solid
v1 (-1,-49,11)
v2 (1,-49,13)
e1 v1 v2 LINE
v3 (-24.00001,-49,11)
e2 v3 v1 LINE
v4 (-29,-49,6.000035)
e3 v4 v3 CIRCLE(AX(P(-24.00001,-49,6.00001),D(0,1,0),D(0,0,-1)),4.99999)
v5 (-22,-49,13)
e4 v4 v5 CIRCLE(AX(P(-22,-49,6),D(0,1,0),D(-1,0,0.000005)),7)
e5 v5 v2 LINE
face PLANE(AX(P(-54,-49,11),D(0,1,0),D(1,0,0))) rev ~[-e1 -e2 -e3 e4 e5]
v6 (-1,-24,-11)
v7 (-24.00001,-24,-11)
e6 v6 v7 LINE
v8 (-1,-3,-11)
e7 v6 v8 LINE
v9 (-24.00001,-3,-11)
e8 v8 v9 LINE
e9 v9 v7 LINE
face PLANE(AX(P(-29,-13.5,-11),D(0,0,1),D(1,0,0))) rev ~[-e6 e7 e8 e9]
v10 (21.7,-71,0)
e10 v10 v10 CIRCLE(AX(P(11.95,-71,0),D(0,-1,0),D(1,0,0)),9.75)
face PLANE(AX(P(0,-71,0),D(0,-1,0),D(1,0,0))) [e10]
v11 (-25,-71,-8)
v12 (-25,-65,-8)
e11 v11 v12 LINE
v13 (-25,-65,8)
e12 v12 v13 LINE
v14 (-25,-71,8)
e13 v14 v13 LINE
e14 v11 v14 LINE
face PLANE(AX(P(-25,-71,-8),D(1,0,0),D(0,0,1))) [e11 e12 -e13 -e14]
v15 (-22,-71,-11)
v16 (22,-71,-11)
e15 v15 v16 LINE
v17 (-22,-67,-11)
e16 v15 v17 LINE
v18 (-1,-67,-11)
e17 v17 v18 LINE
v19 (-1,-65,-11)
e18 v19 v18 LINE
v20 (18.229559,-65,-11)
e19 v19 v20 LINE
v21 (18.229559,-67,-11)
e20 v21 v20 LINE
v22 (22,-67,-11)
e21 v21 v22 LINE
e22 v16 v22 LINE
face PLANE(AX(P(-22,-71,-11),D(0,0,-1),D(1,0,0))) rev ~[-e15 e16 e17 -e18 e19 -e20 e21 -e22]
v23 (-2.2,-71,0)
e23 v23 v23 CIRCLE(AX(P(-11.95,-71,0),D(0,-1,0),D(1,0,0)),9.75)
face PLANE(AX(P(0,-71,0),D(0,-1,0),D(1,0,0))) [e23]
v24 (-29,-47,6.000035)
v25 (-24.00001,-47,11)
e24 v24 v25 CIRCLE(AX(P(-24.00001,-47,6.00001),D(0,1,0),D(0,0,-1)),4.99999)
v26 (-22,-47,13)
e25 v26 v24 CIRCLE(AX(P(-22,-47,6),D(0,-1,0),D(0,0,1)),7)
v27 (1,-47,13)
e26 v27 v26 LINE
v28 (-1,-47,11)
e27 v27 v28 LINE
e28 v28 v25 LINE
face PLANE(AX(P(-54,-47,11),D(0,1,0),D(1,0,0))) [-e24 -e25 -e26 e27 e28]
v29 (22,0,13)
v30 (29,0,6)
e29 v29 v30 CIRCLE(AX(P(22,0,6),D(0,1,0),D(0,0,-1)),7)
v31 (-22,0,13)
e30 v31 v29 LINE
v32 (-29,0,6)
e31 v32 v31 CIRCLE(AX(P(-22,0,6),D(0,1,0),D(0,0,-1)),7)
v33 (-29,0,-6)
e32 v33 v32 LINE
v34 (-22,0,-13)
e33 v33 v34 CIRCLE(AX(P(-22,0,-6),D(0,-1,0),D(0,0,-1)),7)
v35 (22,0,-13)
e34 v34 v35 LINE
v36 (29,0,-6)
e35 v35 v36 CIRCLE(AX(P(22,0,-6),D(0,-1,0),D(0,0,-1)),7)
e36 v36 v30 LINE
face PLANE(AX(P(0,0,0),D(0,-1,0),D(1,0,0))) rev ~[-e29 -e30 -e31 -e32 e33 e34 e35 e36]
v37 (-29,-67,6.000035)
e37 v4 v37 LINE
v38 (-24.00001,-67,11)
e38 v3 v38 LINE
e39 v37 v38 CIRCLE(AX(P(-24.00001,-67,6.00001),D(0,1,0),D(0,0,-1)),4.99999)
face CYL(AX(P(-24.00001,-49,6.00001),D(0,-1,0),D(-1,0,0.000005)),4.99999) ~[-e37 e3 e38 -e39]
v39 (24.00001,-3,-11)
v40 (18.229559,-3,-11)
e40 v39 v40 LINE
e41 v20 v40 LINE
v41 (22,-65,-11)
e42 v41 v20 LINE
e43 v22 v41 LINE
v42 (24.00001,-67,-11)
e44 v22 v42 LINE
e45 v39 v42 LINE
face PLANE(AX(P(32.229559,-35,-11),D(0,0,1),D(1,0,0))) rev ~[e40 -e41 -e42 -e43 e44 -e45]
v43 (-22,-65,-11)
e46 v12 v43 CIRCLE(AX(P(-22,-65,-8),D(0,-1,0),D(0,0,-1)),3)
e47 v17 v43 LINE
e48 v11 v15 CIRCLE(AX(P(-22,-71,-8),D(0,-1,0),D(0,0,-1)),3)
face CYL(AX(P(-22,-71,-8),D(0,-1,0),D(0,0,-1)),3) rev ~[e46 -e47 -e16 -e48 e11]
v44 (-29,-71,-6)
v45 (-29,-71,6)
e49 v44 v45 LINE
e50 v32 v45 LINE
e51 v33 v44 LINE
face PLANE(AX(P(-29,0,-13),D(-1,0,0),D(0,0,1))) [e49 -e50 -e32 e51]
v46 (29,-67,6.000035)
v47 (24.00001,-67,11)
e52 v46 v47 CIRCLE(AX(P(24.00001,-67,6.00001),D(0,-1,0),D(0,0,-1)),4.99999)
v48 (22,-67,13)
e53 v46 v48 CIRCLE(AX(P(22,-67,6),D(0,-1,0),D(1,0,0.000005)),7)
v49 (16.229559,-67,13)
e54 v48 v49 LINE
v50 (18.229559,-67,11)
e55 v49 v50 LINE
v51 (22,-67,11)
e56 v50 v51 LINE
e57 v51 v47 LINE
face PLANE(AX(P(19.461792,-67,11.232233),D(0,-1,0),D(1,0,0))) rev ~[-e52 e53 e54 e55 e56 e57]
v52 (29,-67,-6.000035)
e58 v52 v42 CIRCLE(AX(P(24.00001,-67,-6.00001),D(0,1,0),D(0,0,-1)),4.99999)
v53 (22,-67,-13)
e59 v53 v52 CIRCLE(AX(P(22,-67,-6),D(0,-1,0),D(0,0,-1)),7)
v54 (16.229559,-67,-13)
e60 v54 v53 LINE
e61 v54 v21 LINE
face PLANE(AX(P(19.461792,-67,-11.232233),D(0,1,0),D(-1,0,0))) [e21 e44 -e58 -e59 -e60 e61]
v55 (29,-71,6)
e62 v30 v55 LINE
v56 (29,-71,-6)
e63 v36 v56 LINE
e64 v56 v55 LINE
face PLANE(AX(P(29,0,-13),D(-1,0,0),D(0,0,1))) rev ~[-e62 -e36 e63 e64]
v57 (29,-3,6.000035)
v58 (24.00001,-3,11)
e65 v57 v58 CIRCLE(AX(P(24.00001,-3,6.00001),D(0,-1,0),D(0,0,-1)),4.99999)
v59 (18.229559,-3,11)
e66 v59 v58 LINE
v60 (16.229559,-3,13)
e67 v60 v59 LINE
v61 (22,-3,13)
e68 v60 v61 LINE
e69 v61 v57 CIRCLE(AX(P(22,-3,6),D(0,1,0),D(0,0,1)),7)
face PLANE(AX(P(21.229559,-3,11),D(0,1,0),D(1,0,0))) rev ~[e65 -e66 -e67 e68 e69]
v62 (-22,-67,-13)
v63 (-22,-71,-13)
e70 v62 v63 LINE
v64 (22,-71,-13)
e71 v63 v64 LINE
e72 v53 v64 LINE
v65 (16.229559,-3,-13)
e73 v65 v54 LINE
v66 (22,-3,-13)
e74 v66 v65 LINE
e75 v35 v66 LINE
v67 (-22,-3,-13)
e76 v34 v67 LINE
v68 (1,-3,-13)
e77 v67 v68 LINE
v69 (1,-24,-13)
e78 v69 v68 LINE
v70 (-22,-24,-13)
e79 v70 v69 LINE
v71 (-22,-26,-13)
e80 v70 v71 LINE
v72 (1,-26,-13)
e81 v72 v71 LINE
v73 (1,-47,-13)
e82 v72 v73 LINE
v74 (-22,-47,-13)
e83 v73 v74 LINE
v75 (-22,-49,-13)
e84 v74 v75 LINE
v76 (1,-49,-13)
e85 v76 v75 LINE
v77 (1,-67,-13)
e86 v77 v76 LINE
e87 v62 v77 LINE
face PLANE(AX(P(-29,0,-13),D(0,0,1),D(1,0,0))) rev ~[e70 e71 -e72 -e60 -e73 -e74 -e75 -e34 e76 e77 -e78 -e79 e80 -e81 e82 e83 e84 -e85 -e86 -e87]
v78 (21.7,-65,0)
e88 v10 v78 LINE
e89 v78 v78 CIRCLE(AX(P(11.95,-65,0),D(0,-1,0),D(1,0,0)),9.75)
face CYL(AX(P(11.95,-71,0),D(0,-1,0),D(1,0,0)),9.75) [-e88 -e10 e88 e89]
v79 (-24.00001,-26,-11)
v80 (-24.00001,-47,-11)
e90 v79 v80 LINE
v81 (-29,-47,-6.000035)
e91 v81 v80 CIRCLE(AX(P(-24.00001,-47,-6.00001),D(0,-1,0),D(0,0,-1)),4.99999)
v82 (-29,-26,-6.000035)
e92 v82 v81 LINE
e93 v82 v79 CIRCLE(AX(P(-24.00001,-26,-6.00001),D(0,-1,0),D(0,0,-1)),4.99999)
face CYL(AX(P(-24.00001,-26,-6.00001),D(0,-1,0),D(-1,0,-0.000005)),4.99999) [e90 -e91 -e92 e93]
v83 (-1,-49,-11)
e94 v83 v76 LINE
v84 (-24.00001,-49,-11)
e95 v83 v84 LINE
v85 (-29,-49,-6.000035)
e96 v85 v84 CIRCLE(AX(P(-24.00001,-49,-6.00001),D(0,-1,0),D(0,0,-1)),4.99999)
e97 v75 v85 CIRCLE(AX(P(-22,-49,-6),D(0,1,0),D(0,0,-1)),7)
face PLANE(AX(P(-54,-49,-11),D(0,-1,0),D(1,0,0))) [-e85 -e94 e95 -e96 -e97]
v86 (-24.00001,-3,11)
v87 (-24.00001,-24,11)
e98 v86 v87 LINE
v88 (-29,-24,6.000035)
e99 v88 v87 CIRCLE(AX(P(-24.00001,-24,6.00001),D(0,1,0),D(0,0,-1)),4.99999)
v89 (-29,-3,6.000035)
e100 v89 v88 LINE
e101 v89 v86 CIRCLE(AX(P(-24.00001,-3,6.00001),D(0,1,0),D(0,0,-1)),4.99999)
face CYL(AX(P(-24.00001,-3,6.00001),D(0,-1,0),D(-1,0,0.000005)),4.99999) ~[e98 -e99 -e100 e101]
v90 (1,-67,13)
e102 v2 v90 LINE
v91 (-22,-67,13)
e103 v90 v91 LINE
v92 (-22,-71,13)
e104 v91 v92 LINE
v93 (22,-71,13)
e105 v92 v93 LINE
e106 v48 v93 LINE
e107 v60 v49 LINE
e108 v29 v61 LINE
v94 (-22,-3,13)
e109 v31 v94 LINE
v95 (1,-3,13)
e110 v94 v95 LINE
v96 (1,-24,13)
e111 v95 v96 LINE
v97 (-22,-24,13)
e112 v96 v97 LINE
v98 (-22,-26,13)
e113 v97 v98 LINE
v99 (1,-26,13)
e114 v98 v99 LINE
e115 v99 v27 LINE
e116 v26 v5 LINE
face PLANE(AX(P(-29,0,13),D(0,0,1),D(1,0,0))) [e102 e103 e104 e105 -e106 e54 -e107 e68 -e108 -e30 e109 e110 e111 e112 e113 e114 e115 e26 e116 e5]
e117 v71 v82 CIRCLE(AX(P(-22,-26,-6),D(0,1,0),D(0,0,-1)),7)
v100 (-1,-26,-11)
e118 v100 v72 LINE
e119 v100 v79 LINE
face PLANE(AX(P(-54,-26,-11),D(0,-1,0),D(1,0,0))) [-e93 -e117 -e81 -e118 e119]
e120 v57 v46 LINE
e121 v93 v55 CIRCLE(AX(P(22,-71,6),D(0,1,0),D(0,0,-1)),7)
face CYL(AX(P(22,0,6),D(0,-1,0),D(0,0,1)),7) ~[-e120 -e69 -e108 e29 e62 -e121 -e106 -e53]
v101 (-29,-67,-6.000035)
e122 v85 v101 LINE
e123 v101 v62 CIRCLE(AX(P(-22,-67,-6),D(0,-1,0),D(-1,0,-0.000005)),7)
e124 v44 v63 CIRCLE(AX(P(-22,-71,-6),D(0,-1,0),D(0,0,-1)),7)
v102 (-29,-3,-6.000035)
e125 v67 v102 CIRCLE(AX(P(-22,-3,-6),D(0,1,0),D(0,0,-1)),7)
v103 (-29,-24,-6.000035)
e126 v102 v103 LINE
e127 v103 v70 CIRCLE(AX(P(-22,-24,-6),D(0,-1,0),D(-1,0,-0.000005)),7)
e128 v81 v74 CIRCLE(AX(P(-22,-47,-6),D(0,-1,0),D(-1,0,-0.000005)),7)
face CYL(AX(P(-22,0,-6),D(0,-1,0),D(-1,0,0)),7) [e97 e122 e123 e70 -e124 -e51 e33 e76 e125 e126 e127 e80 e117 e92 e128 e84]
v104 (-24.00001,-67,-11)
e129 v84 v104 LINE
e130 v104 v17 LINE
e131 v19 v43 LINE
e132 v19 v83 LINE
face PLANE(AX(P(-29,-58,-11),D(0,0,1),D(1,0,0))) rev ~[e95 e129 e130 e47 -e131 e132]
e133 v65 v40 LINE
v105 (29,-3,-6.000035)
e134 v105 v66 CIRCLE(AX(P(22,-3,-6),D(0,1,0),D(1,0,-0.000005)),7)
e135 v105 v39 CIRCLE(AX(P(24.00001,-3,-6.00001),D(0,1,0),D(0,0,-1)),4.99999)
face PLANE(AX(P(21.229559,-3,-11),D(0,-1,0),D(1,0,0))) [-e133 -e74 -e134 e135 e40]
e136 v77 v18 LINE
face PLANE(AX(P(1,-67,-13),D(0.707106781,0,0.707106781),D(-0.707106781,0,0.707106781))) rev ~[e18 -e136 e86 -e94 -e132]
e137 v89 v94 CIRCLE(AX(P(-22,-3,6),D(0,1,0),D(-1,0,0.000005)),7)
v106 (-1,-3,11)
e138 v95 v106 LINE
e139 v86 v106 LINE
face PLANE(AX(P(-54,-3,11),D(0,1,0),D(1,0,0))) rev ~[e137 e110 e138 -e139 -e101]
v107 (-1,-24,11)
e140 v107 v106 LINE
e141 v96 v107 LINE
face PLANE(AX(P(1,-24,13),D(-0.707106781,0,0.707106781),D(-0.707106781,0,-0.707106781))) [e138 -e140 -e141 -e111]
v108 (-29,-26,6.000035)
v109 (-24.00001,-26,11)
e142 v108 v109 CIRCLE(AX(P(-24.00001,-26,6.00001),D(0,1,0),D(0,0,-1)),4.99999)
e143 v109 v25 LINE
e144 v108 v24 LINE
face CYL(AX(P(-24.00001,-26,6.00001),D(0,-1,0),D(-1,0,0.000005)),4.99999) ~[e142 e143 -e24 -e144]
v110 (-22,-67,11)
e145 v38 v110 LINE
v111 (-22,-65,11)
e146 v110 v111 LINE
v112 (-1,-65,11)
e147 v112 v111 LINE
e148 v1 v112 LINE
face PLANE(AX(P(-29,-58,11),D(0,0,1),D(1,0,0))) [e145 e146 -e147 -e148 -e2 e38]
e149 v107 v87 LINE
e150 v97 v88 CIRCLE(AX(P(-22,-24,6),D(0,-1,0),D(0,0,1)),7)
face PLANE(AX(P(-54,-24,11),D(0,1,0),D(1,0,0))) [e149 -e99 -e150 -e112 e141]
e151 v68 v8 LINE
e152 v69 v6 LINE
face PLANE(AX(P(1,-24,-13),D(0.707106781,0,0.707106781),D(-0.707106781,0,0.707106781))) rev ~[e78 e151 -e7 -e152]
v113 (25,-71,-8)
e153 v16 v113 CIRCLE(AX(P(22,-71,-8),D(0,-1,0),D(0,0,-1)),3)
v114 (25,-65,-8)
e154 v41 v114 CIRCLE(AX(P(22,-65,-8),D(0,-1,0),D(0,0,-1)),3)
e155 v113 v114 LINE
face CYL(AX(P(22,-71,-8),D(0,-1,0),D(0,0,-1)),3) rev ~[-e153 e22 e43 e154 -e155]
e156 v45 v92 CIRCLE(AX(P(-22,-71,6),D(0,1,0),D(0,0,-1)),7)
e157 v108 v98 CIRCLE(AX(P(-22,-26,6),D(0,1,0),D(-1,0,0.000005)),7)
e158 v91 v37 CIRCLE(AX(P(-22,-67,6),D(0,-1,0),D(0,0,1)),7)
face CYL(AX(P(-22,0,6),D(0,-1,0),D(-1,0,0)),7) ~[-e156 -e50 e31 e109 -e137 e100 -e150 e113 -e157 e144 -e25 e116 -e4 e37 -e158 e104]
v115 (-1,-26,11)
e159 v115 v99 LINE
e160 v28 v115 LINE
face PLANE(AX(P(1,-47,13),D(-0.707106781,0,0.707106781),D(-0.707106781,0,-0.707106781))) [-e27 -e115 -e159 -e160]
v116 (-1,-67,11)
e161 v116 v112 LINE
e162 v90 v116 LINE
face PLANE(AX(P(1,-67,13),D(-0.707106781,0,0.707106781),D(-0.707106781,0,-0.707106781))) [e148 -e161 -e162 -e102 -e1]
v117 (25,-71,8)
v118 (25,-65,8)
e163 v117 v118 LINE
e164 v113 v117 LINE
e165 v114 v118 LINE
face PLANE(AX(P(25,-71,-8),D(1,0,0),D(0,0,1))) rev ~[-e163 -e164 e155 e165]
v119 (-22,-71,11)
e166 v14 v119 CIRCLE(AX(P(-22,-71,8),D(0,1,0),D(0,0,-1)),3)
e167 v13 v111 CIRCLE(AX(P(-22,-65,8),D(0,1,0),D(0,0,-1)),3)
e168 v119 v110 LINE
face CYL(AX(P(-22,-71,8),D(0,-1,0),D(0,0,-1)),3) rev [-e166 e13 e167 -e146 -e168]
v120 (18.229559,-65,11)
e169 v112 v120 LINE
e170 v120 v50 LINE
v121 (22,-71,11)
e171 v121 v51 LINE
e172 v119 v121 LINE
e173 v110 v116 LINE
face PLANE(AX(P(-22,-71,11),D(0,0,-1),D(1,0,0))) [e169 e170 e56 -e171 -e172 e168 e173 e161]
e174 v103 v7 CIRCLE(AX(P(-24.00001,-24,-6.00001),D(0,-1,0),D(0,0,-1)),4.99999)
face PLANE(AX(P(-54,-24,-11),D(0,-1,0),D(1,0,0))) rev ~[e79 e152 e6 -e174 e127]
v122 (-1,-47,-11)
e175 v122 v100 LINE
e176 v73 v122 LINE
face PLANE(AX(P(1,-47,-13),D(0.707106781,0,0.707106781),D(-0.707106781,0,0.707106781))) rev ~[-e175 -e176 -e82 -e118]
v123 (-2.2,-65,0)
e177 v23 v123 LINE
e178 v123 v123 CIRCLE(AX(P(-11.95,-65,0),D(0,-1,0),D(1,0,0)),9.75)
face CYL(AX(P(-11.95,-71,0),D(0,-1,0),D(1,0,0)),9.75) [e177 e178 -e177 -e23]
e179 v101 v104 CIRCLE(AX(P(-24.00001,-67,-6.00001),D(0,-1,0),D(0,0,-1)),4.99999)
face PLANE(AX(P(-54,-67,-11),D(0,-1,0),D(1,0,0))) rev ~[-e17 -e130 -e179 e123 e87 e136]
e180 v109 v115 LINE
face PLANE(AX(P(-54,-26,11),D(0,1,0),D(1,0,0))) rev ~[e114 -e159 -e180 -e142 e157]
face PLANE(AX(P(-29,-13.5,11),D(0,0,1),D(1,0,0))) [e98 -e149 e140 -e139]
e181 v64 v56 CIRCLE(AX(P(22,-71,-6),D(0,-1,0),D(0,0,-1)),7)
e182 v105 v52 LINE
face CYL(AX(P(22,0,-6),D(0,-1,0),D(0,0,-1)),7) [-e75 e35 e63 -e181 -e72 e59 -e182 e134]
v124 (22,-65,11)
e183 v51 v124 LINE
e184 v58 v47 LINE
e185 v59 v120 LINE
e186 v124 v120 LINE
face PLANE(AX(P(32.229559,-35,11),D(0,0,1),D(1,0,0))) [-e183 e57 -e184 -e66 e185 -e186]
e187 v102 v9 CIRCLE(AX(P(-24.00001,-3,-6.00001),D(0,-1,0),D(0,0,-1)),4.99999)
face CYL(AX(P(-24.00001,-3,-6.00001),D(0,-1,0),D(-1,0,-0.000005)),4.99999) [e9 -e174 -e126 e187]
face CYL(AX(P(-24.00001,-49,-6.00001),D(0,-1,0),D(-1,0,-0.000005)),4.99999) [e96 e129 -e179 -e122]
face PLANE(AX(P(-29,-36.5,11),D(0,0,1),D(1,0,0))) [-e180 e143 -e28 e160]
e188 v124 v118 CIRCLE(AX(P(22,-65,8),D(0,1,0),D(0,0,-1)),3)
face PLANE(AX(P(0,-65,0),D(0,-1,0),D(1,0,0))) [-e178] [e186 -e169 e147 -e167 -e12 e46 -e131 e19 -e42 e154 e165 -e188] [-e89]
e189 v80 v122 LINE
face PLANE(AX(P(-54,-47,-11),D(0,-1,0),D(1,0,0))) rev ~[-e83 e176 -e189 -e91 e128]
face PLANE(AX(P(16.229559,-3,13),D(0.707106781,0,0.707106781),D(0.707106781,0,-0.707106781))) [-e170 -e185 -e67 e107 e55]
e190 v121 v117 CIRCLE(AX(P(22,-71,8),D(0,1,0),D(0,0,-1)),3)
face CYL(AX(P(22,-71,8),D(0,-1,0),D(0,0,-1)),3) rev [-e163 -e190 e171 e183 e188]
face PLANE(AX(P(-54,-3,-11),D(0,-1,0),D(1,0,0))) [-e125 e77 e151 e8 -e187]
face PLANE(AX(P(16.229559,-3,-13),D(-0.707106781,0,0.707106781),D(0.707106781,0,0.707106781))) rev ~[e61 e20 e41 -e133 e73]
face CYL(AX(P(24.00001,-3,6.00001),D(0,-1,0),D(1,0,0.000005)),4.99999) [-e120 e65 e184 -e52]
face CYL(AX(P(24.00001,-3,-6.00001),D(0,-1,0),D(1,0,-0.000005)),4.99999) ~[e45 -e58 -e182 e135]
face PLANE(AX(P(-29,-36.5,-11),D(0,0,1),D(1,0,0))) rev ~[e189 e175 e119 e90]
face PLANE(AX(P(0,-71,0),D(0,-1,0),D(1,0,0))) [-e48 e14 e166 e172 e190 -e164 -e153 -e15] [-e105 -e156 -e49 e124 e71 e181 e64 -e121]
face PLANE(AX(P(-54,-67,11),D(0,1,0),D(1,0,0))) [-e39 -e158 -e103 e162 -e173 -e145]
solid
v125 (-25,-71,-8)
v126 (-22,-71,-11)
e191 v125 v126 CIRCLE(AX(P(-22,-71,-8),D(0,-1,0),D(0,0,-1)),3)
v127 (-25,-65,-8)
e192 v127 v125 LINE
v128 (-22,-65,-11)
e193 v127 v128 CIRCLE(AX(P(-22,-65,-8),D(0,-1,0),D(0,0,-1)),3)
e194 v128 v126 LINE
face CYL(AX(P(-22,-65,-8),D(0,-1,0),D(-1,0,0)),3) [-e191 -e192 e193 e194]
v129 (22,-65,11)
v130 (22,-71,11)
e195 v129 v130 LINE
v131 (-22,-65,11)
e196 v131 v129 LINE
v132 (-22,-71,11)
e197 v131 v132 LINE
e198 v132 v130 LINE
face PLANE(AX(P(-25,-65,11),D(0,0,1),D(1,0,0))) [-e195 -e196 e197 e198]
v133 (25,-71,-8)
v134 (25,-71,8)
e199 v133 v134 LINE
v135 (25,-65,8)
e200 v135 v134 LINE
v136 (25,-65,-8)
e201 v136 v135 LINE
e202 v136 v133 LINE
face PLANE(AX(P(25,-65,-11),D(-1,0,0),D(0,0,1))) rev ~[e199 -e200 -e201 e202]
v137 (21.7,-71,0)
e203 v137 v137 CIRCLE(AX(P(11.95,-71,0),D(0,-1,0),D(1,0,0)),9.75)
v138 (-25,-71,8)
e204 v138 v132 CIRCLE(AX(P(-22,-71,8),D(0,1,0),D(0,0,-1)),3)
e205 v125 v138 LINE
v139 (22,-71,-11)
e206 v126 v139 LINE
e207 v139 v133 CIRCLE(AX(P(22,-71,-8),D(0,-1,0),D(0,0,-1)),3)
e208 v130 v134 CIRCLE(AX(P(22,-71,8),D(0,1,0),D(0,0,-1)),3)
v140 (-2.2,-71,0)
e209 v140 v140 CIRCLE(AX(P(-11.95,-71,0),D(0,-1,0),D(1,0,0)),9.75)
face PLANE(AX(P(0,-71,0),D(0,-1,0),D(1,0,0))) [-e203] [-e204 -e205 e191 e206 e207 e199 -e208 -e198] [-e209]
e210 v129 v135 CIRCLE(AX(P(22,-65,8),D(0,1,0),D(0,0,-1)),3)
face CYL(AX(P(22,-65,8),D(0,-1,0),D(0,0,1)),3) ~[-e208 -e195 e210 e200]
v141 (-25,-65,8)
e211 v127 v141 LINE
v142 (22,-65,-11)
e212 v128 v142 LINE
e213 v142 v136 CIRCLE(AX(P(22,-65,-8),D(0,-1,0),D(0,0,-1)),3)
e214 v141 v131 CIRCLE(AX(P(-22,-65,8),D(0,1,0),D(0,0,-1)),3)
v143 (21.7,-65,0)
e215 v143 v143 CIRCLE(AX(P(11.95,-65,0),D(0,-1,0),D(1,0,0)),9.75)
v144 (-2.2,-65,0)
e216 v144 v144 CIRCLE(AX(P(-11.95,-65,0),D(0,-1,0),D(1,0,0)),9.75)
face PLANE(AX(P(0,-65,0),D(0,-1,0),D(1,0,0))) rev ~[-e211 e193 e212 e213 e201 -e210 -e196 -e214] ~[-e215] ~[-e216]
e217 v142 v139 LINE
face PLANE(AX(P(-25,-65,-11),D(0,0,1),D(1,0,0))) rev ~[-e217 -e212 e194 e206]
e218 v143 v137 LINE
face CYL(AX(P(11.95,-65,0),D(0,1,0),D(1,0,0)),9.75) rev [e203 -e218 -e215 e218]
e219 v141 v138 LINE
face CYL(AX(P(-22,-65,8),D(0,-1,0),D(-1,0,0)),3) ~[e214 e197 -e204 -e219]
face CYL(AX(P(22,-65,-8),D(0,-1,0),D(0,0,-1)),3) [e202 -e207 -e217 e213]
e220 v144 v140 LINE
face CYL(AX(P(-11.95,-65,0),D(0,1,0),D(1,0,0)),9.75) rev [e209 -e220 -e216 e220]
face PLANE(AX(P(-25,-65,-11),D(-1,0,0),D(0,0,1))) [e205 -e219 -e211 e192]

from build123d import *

# Parameters (mm, degrees)
F1_START      = 65
F0_W          = 50
F0_H          = 22
F0_R          = 9.75
F1_DEPTH      = 6
F2_R          = 3
F3_W          = 58
F3_H          = 26
F4_DEPTH      = 71
F5_DEPTH      = 6
F6_R          = 7
F8_START      = -11
F7_W          = 50
F7_H          = 21
F7_H_2        = 18
F7_W_2        = 22
F7_H_3        = 64
F8_DEPTH      = 17.9
F9_START      = 11
F9_DEPTH      = 6.8
F10_R         = 4.99999
F11_T4_DEPTH  = 46.7168298797
F11_T10_DEPTH = 21
F11_T15_DEPTH = 46.7168298797
F11_T21_DEPTH = 21
F11_T26_DEPTH = 46.7168298797
F11_T32_DEPTH = 18
F11_T37_DEPTH = 43.7168298797
F11_T43_DEPTH = 64
F11_T48_DEPTH = 46.7168298797
F11_T54_DEPTH = 21
F11_T59_DEPTH = 46.7168298797
F11_T65_DEPTH = 21
F11_T70_DEPTH = 46.7168298797
F11_T76_DEPTH = 18
F11_T81_DEPTH = 43.7168298797
F11_T87_DEPTH = 64


# Not quite as in the source:
# - a fillet or chamfer that OpenCascade refuses, or shapes differently, is made with other operations: its cross-section is extruded or revolved along the edge and cut away or added
# - a fillet or chamfer is up to 0.001 mm smaller than in the source, because OpenCascade refuses the exact size


with BuildPart() as f1:
    # F0 (on Front) → F1 (new body)
    with BuildSketch(Plane.XZ.offset(F1_START)):
        Rectangle(F0_W, F0_H)
        with Locations((-11.95, 0)):
            Circle(F0_R, mode=Mode.SUBTRACT)
        with Locations((11.95, 0)):
            Circle(F0_R, mode=Mode.SUBTRACT)
    extrude(amount=F1_DEPTH)

    # F2
    f2_edges = [f1.edges().sort_by_distance(p)[0] for p in [
        (25, -68, 11),
        (25, -68, -11),
        (-25, -68, 11),
        (-25, -68, -11),
    ]]
    fillet(f2_edges, radius=F2_R)


with BuildPart() as f4:
    # F3 (on Front) → F4 (new body)
    with BuildSketch(Plane.XZ):
        Rectangle(F3_W, F3_H)
    extrude(amount=F4_DEPTH)

    # F5 (cut): a face of the model
    f5_faces = [f1.part.faces().sort_by_distance(p)[0] for p in [
        (0, -71, 0),
    ]]
    extrude(f5_faces, amount=-F5_DEPTH, mode=Mode.SUBTRACT)

    # F6
    f6_edges = [f4.edges().sort_by_distance(p)[0] for p in [
        (-29, -35.5, 13),
        (-29, -35.5, -13),
        (29, -35.5, 13),
        (29, -35.5, -13),
    ]]
    fillet(f6_edges, radius=F6_R)

    # F7 (on Top) → F8 (cut)
    with BuildSketch(Plane.XY.offset(F8_START)):
        with Locations((-29, -13.5)):
            Rectangle(F7_W, F7_H)
        with Locations((-29, -36.5)):
            Rectangle(F7_W, F7_H)
        with Locations((-29, -58)):
            Rectangle(F7_W, F7_H_2)
        with Locations((32.2295585051, -35)):
            Rectangle(F7_W_2, F7_H_3)
    extrude(amount=-F8_DEPTH, mode=Mode.SUBTRACT)

    # F7 (on Top) → F9 (cut)
    with BuildSketch(Plane.XY.offset(F9_START)):
        with Locations((-29, -13.5)):
            Rectangle(F7_W, F7_H)
        with Locations((-29, -36.5)):
            Rectangle(F7_W, F7_H)
        with Locations((-29, -58)):
            Rectangle(F7_W, F7_H_2)
        with Locations((32.2295585051, -35)):
            Rectangle(F7_W_2, F7_H_3)
    extrude(amount=F9_DEPTH, mode=Mode.SUBTRACT)

    # F10 (radius 5 in the source; OpenCascade refuses exactly that, so slightly less here)
    f10_edges = [f4.edges().sort_by_distance(p)[0] for p in [
        (-26.898979, -36.5, 11),
        (-26.898979, -13.5, 11),
        (-26.898979, -58, 11),
        (26.898979, -35, 11),
        (-26.898979, -13.5, -11),
        (-26.898979, -36.5, -11),
        (-26.898979, -58, -11),
        (26.898979, -35, -11),
    ]]
    fillet(f10_edges, radius=F10_R)

    # F11: chamfer of 5 on 8 edges, made by hand


with BuildPart() as f11_tool2:
    # F11_s3 → F11_t4 (new body)
    with BuildSketch(Plane.XZ.offset(36.8584149398)):
        Polygon((1, 13), (-4, 8), (-4, 13), align=None)
    extrude(amount=-F11_T4_DEPTH)

    split(bisect_by=Plane.XZ.offset(26), keep=Keep.TOP)

    split(bisect_by=Plane.XY.offset(11), keep=Keep.TOP)


with BuildPart() as f4_1:
    add(f4.part)

    # F11_t1: cut F11_tool2
    add(f11_tool2.part, mode=Mode.SUBTRACT)


with BuildPart() as f11_tool8:
    # F11_s9 → F11_t10 (new body)
    with BuildSketch(Plane.XZ.offset(24)):
        Polygon((1, 13), (-4, 8), (-4, 13), align=None)
    extrude(amount=-F11_T10_DEPTH)

    split(bisect_by=Plane.XY.offset(11), keep=Keep.TOP)


with BuildPart() as f4_2:
    add(f4_1.part)

    # F11_t7: cut F11_tool8
    add(f11_tool8.part, mode=Mode.SUBTRACT)


with BuildPart() as f11_tool13:
    # F11_s14 → F11_t15 (new body)
    with BuildSketch(Plane.XZ.offset(59.8584149398)):
        Polygon((1, 13), (-4, 8), (-4, 13), align=None)
    extrude(amount=-F11_T15_DEPTH)

    split(bisect_by=Plane.XZ.offset(49), keep=Keep.TOP)

    split(bisect_by=Plane.XY.offset(11), keep=Keep.TOP)


with BuildPart() as f4_3:
    add(f4_2.part)

    # F11_t12: cut F11_tool13
    add(f11_tool13.part, mode=Mode.SUBTRACT)


with BuildPart() as f11_tool19:
    # F11_s20 → F11_t21 (new body)
    with BuildSketch(Plane.XZ.offset(47)):
        Polygon((1, 13), (-4, 8), (-4, 13), align=None)
    extrude(amount=-F11_T21_DEPTH)

    split(bisect_by=Plane.XY.offset(11), keep=Keep.TOP)


with BuildPart() as f4_4:
    add(f4_3.part)

    # F11_t18: cut F11_tool19
    add(f11_tool19.part, mode=Mode.SUBTRACT)


with BuildPart() as f11_tool24:
    # F11_s25 → F11_t26 (new body)
    with BuildSketch(Plane.XZ.offset(59.8584149398)):
        Polygon((1, 13), (-4, 8), (-4, 13), align=None)
    extrude(amount=-F11_T26_DEPTH)

    split(bisect_by=Plane.XZ.offset(24), keep=Keep.BOTTOM)

    split(bisect_by=Plane.XY.offset(11), keep=Keep.TOP)


with BuildPart() as f4_5:
    add(f4_4.part)

    # F11_t23: cut F11_tool24
    add(f11_tool24.part, mode=Mode.SUBTRACT)


with BuildPart() as f11_tool30:
    # F11_s31 → F11_t32 (new body)
    with BuildSketch(Plane.XZ.offset(67)):
        Polygon((1, 13), (-4, 8), (-4, 13), align=None)
    extrude(amount=-F11_T32_DEPTH)

    split(bisect_by=Plane.XY.offset(11), keep=Keep.TOP)


with BuildPart() as f4_6:
    add(f4_5.part)

    # F11_t29: cut F11_tool30
    add(f11_tool30.part, mode=Mode.SUBTRACT)


with BuildPart() as f11_tool35:
    # F11_s36 → F11_t37 (new body)
    with BuildSketch(Plane.XZ.offset(79.8584149398)):
        Polygon((1, 13), (-4, 8), (-4, 13), align=None)
    extrude(amount=-F11_T37_DEPTH)

    split(bisect_by=Plane.XZ.offset(47), keep=Keep.BOTTOM)

    split(bisect_by=Plane.XY.offset(11), keep=Keep.TOP)


with BuildPart() as f4_7:
    add(f4_6.part)

    # F11_t34: cut F11_tool35
    add(f11_tool35.part, mode=Mode.SUBTRACT)


with BuildPart() as f11_tool41:
    # F11_s42 → F11_t43 (new body)
    with BuildSketch(Plane.XZ.offset(3)):
        Polygon((16.2295585051, 13), (21.2295585051, 8), (21.2295585051, 13), align=None)
    extrude(amount=F11_T43_DEPTH)

    split(bisect_by=Plane.XY.offset(11), keep=Keep.TOP)


with BuildPart() as f4_8:
    add(f4_7.part)

    # F11_t40: cut F11_tool41
    add(f11_tool41.part, mode=Mode.SUBTRACT)


with BuildPart() as f11_tool46:
    # F11_s47 → F11_t48 (new body)
    with BuildSketch(Plane.XZ.offset(36.8584149398)):
        Polygon((1, -13), (-4, -8), (-4, -13), align=None)
    extrude(amount=-F11_T48_DEPTH)

    split(bisect_by=Plane.XZ.offset(26), keep=Keep.TOP)

    split(bisect_by=Plane.XY.offset(-11), keep=Keep.BOTTOM)


with BuildPart() as f4_9:
    add(f4_8.part)

    # F11_t45: cut F11_tool46
    add(f11_tool46.part, mode=Mode.SUBTRACT)


with BuildPart() as f11_tool52:
    # F11_s53 → F11_t54 (new body)
    with BuildSketch(Plane.XZ.offset(24)):
        Polygon((1, -13), (-4, -8), (-4, -13), align=None)
    extrude(amount=-F11_T54_DEPTH)

    split(bisect_by=Plane.XY.offset(-11), keep=Keep.BOTTOM)


with BuildPart() as f4_10:
    add(f4_9.part)

    # F11_t51: cut F11_tool52
    add(f11_tool52.part, mode=Mode.SUBTRACT)


with BuildPart() as f11_tool57:
    # F11_s58 → F11_t59 (new body)
    with BuildSketch(Plane.XZ.offset(59.8584149398)):
        Polygon((1, -13), (-4, -8), (-4, -13), align=None)
    extrude(amount=-F11_T59_DEPTH)

    split(bisect_by=Plane.XZ.offset(49), keep=Keep.TOP)

    split(bisect_by=Plane.XY.offset(-11), keep=Keep.BOTTOM)


with BuildPart() as f4_11:
    add(f4_10.part)

    # F11_t56: cut F11_tool57
    add(f11_tool57.part, mode=Mode.SUBTRACT)


with BuildPart() as f11_tool63:
    # F11_s64 → F11_t65 (new body)
    with BuildSketch(Plane.XZ.offset(47)):
        Polygon((1, -13), (-4, -8), (-4, -13), align=None)
    extrude(amount=-F11_T65_DEPTH)

    split(bisect_by=Plane.XY.offset(-11), keep=Keep.BOTTOM)


with BuildPart() as f4_12:
    add(f4_11.part)

    # F11_t62: cut F11_tool63
    add(f11_tool63.part, mode=Mode.SUBTRACT)


with BuildPart() as f11_tool68:
    # F11_s69 → F11_t70 (new body)
    with BuildSketch(Plane.XZ.offset(59.8584149398)):
        Polygon((1, -13), (-4, -8), (-4, -13), align=None)
    extrude(amount=-F11_T70_DEPTH)

    split(bisect_by=Plane.XZ.offset(24), keep=Keep.BOTTOM)

    split(bisect_by=Plane.XY.offset(-11), keep=Keep.BOTTOM)


with BuildPart() as f4_13:
    add(f4_12.part)

    # F11_t67: cut F11_tool68
    add(f11_tool68.part, mode=Mode.SUBTRACT)


with BuildPart() as f11_tool74:
    # F11_s75 → F11_t76 (new body)
    with BuildSketch(Plane.XZ.offset(67)):
        Polygon((1, -13), (-4, -8), (-4, -13), align=None)
    extrude(amount=-F11_T76_DEPTH)

    split(bisect_by=Plane.XY.offset(-11), keep=Keep.BOTTOM)


with BuildPart() as f4_14:
    add(f4_13.part)

    # F11_t73: cut F11_tool74
    add(f11_tool74.part, mode=Mode.SUBTRACT)


with BuildPart() as f11_tool79:
    # F11_s80 → F11_t81 (new body)
    with BuildSketch(Plane.XZ.offset(79.8584149398)):
        Polygon((1, -13), (-4, -8), (-4, -13), align=None)
    extrude(amount=-F11_T81_DEPTH)

    split(bisect_by=Plane.XZ.offset(47), keep=Keep.BOTTOM)

    split(bisect_by=Plane.XY.offset(-11), keep=Keep.BOTTOM)


with BuildPart() as f4_15:
    add(f4_14.part)

    # F11_t78: cut F11_tool79
    add(f11_tool79.part, mode=Mode.SUBTRACT)


with BuildPart() as f11_tool85:
    # F11_s86 → F11_t87 (new body)
    with BuildSketch(Plane.XZ.offset(3)):
        Polygon((16.2295585051, -13), (21.2295585051, -8), (21.2295585051, -13), align=None)
    extrude(amount=F11_T87_DEPTH)

    split(bisect_by=Plane.XY.offset(-11), keep=Keep.BOTTOM)


with BuildPart() as f4_16:
    add(f4_15.part)

    # F11_t84: cut F11_tool85
    add(f11_tool85.part, mode=Mode.SUBTRACT)


solid = Compound([f1.part, f4_16.part])
